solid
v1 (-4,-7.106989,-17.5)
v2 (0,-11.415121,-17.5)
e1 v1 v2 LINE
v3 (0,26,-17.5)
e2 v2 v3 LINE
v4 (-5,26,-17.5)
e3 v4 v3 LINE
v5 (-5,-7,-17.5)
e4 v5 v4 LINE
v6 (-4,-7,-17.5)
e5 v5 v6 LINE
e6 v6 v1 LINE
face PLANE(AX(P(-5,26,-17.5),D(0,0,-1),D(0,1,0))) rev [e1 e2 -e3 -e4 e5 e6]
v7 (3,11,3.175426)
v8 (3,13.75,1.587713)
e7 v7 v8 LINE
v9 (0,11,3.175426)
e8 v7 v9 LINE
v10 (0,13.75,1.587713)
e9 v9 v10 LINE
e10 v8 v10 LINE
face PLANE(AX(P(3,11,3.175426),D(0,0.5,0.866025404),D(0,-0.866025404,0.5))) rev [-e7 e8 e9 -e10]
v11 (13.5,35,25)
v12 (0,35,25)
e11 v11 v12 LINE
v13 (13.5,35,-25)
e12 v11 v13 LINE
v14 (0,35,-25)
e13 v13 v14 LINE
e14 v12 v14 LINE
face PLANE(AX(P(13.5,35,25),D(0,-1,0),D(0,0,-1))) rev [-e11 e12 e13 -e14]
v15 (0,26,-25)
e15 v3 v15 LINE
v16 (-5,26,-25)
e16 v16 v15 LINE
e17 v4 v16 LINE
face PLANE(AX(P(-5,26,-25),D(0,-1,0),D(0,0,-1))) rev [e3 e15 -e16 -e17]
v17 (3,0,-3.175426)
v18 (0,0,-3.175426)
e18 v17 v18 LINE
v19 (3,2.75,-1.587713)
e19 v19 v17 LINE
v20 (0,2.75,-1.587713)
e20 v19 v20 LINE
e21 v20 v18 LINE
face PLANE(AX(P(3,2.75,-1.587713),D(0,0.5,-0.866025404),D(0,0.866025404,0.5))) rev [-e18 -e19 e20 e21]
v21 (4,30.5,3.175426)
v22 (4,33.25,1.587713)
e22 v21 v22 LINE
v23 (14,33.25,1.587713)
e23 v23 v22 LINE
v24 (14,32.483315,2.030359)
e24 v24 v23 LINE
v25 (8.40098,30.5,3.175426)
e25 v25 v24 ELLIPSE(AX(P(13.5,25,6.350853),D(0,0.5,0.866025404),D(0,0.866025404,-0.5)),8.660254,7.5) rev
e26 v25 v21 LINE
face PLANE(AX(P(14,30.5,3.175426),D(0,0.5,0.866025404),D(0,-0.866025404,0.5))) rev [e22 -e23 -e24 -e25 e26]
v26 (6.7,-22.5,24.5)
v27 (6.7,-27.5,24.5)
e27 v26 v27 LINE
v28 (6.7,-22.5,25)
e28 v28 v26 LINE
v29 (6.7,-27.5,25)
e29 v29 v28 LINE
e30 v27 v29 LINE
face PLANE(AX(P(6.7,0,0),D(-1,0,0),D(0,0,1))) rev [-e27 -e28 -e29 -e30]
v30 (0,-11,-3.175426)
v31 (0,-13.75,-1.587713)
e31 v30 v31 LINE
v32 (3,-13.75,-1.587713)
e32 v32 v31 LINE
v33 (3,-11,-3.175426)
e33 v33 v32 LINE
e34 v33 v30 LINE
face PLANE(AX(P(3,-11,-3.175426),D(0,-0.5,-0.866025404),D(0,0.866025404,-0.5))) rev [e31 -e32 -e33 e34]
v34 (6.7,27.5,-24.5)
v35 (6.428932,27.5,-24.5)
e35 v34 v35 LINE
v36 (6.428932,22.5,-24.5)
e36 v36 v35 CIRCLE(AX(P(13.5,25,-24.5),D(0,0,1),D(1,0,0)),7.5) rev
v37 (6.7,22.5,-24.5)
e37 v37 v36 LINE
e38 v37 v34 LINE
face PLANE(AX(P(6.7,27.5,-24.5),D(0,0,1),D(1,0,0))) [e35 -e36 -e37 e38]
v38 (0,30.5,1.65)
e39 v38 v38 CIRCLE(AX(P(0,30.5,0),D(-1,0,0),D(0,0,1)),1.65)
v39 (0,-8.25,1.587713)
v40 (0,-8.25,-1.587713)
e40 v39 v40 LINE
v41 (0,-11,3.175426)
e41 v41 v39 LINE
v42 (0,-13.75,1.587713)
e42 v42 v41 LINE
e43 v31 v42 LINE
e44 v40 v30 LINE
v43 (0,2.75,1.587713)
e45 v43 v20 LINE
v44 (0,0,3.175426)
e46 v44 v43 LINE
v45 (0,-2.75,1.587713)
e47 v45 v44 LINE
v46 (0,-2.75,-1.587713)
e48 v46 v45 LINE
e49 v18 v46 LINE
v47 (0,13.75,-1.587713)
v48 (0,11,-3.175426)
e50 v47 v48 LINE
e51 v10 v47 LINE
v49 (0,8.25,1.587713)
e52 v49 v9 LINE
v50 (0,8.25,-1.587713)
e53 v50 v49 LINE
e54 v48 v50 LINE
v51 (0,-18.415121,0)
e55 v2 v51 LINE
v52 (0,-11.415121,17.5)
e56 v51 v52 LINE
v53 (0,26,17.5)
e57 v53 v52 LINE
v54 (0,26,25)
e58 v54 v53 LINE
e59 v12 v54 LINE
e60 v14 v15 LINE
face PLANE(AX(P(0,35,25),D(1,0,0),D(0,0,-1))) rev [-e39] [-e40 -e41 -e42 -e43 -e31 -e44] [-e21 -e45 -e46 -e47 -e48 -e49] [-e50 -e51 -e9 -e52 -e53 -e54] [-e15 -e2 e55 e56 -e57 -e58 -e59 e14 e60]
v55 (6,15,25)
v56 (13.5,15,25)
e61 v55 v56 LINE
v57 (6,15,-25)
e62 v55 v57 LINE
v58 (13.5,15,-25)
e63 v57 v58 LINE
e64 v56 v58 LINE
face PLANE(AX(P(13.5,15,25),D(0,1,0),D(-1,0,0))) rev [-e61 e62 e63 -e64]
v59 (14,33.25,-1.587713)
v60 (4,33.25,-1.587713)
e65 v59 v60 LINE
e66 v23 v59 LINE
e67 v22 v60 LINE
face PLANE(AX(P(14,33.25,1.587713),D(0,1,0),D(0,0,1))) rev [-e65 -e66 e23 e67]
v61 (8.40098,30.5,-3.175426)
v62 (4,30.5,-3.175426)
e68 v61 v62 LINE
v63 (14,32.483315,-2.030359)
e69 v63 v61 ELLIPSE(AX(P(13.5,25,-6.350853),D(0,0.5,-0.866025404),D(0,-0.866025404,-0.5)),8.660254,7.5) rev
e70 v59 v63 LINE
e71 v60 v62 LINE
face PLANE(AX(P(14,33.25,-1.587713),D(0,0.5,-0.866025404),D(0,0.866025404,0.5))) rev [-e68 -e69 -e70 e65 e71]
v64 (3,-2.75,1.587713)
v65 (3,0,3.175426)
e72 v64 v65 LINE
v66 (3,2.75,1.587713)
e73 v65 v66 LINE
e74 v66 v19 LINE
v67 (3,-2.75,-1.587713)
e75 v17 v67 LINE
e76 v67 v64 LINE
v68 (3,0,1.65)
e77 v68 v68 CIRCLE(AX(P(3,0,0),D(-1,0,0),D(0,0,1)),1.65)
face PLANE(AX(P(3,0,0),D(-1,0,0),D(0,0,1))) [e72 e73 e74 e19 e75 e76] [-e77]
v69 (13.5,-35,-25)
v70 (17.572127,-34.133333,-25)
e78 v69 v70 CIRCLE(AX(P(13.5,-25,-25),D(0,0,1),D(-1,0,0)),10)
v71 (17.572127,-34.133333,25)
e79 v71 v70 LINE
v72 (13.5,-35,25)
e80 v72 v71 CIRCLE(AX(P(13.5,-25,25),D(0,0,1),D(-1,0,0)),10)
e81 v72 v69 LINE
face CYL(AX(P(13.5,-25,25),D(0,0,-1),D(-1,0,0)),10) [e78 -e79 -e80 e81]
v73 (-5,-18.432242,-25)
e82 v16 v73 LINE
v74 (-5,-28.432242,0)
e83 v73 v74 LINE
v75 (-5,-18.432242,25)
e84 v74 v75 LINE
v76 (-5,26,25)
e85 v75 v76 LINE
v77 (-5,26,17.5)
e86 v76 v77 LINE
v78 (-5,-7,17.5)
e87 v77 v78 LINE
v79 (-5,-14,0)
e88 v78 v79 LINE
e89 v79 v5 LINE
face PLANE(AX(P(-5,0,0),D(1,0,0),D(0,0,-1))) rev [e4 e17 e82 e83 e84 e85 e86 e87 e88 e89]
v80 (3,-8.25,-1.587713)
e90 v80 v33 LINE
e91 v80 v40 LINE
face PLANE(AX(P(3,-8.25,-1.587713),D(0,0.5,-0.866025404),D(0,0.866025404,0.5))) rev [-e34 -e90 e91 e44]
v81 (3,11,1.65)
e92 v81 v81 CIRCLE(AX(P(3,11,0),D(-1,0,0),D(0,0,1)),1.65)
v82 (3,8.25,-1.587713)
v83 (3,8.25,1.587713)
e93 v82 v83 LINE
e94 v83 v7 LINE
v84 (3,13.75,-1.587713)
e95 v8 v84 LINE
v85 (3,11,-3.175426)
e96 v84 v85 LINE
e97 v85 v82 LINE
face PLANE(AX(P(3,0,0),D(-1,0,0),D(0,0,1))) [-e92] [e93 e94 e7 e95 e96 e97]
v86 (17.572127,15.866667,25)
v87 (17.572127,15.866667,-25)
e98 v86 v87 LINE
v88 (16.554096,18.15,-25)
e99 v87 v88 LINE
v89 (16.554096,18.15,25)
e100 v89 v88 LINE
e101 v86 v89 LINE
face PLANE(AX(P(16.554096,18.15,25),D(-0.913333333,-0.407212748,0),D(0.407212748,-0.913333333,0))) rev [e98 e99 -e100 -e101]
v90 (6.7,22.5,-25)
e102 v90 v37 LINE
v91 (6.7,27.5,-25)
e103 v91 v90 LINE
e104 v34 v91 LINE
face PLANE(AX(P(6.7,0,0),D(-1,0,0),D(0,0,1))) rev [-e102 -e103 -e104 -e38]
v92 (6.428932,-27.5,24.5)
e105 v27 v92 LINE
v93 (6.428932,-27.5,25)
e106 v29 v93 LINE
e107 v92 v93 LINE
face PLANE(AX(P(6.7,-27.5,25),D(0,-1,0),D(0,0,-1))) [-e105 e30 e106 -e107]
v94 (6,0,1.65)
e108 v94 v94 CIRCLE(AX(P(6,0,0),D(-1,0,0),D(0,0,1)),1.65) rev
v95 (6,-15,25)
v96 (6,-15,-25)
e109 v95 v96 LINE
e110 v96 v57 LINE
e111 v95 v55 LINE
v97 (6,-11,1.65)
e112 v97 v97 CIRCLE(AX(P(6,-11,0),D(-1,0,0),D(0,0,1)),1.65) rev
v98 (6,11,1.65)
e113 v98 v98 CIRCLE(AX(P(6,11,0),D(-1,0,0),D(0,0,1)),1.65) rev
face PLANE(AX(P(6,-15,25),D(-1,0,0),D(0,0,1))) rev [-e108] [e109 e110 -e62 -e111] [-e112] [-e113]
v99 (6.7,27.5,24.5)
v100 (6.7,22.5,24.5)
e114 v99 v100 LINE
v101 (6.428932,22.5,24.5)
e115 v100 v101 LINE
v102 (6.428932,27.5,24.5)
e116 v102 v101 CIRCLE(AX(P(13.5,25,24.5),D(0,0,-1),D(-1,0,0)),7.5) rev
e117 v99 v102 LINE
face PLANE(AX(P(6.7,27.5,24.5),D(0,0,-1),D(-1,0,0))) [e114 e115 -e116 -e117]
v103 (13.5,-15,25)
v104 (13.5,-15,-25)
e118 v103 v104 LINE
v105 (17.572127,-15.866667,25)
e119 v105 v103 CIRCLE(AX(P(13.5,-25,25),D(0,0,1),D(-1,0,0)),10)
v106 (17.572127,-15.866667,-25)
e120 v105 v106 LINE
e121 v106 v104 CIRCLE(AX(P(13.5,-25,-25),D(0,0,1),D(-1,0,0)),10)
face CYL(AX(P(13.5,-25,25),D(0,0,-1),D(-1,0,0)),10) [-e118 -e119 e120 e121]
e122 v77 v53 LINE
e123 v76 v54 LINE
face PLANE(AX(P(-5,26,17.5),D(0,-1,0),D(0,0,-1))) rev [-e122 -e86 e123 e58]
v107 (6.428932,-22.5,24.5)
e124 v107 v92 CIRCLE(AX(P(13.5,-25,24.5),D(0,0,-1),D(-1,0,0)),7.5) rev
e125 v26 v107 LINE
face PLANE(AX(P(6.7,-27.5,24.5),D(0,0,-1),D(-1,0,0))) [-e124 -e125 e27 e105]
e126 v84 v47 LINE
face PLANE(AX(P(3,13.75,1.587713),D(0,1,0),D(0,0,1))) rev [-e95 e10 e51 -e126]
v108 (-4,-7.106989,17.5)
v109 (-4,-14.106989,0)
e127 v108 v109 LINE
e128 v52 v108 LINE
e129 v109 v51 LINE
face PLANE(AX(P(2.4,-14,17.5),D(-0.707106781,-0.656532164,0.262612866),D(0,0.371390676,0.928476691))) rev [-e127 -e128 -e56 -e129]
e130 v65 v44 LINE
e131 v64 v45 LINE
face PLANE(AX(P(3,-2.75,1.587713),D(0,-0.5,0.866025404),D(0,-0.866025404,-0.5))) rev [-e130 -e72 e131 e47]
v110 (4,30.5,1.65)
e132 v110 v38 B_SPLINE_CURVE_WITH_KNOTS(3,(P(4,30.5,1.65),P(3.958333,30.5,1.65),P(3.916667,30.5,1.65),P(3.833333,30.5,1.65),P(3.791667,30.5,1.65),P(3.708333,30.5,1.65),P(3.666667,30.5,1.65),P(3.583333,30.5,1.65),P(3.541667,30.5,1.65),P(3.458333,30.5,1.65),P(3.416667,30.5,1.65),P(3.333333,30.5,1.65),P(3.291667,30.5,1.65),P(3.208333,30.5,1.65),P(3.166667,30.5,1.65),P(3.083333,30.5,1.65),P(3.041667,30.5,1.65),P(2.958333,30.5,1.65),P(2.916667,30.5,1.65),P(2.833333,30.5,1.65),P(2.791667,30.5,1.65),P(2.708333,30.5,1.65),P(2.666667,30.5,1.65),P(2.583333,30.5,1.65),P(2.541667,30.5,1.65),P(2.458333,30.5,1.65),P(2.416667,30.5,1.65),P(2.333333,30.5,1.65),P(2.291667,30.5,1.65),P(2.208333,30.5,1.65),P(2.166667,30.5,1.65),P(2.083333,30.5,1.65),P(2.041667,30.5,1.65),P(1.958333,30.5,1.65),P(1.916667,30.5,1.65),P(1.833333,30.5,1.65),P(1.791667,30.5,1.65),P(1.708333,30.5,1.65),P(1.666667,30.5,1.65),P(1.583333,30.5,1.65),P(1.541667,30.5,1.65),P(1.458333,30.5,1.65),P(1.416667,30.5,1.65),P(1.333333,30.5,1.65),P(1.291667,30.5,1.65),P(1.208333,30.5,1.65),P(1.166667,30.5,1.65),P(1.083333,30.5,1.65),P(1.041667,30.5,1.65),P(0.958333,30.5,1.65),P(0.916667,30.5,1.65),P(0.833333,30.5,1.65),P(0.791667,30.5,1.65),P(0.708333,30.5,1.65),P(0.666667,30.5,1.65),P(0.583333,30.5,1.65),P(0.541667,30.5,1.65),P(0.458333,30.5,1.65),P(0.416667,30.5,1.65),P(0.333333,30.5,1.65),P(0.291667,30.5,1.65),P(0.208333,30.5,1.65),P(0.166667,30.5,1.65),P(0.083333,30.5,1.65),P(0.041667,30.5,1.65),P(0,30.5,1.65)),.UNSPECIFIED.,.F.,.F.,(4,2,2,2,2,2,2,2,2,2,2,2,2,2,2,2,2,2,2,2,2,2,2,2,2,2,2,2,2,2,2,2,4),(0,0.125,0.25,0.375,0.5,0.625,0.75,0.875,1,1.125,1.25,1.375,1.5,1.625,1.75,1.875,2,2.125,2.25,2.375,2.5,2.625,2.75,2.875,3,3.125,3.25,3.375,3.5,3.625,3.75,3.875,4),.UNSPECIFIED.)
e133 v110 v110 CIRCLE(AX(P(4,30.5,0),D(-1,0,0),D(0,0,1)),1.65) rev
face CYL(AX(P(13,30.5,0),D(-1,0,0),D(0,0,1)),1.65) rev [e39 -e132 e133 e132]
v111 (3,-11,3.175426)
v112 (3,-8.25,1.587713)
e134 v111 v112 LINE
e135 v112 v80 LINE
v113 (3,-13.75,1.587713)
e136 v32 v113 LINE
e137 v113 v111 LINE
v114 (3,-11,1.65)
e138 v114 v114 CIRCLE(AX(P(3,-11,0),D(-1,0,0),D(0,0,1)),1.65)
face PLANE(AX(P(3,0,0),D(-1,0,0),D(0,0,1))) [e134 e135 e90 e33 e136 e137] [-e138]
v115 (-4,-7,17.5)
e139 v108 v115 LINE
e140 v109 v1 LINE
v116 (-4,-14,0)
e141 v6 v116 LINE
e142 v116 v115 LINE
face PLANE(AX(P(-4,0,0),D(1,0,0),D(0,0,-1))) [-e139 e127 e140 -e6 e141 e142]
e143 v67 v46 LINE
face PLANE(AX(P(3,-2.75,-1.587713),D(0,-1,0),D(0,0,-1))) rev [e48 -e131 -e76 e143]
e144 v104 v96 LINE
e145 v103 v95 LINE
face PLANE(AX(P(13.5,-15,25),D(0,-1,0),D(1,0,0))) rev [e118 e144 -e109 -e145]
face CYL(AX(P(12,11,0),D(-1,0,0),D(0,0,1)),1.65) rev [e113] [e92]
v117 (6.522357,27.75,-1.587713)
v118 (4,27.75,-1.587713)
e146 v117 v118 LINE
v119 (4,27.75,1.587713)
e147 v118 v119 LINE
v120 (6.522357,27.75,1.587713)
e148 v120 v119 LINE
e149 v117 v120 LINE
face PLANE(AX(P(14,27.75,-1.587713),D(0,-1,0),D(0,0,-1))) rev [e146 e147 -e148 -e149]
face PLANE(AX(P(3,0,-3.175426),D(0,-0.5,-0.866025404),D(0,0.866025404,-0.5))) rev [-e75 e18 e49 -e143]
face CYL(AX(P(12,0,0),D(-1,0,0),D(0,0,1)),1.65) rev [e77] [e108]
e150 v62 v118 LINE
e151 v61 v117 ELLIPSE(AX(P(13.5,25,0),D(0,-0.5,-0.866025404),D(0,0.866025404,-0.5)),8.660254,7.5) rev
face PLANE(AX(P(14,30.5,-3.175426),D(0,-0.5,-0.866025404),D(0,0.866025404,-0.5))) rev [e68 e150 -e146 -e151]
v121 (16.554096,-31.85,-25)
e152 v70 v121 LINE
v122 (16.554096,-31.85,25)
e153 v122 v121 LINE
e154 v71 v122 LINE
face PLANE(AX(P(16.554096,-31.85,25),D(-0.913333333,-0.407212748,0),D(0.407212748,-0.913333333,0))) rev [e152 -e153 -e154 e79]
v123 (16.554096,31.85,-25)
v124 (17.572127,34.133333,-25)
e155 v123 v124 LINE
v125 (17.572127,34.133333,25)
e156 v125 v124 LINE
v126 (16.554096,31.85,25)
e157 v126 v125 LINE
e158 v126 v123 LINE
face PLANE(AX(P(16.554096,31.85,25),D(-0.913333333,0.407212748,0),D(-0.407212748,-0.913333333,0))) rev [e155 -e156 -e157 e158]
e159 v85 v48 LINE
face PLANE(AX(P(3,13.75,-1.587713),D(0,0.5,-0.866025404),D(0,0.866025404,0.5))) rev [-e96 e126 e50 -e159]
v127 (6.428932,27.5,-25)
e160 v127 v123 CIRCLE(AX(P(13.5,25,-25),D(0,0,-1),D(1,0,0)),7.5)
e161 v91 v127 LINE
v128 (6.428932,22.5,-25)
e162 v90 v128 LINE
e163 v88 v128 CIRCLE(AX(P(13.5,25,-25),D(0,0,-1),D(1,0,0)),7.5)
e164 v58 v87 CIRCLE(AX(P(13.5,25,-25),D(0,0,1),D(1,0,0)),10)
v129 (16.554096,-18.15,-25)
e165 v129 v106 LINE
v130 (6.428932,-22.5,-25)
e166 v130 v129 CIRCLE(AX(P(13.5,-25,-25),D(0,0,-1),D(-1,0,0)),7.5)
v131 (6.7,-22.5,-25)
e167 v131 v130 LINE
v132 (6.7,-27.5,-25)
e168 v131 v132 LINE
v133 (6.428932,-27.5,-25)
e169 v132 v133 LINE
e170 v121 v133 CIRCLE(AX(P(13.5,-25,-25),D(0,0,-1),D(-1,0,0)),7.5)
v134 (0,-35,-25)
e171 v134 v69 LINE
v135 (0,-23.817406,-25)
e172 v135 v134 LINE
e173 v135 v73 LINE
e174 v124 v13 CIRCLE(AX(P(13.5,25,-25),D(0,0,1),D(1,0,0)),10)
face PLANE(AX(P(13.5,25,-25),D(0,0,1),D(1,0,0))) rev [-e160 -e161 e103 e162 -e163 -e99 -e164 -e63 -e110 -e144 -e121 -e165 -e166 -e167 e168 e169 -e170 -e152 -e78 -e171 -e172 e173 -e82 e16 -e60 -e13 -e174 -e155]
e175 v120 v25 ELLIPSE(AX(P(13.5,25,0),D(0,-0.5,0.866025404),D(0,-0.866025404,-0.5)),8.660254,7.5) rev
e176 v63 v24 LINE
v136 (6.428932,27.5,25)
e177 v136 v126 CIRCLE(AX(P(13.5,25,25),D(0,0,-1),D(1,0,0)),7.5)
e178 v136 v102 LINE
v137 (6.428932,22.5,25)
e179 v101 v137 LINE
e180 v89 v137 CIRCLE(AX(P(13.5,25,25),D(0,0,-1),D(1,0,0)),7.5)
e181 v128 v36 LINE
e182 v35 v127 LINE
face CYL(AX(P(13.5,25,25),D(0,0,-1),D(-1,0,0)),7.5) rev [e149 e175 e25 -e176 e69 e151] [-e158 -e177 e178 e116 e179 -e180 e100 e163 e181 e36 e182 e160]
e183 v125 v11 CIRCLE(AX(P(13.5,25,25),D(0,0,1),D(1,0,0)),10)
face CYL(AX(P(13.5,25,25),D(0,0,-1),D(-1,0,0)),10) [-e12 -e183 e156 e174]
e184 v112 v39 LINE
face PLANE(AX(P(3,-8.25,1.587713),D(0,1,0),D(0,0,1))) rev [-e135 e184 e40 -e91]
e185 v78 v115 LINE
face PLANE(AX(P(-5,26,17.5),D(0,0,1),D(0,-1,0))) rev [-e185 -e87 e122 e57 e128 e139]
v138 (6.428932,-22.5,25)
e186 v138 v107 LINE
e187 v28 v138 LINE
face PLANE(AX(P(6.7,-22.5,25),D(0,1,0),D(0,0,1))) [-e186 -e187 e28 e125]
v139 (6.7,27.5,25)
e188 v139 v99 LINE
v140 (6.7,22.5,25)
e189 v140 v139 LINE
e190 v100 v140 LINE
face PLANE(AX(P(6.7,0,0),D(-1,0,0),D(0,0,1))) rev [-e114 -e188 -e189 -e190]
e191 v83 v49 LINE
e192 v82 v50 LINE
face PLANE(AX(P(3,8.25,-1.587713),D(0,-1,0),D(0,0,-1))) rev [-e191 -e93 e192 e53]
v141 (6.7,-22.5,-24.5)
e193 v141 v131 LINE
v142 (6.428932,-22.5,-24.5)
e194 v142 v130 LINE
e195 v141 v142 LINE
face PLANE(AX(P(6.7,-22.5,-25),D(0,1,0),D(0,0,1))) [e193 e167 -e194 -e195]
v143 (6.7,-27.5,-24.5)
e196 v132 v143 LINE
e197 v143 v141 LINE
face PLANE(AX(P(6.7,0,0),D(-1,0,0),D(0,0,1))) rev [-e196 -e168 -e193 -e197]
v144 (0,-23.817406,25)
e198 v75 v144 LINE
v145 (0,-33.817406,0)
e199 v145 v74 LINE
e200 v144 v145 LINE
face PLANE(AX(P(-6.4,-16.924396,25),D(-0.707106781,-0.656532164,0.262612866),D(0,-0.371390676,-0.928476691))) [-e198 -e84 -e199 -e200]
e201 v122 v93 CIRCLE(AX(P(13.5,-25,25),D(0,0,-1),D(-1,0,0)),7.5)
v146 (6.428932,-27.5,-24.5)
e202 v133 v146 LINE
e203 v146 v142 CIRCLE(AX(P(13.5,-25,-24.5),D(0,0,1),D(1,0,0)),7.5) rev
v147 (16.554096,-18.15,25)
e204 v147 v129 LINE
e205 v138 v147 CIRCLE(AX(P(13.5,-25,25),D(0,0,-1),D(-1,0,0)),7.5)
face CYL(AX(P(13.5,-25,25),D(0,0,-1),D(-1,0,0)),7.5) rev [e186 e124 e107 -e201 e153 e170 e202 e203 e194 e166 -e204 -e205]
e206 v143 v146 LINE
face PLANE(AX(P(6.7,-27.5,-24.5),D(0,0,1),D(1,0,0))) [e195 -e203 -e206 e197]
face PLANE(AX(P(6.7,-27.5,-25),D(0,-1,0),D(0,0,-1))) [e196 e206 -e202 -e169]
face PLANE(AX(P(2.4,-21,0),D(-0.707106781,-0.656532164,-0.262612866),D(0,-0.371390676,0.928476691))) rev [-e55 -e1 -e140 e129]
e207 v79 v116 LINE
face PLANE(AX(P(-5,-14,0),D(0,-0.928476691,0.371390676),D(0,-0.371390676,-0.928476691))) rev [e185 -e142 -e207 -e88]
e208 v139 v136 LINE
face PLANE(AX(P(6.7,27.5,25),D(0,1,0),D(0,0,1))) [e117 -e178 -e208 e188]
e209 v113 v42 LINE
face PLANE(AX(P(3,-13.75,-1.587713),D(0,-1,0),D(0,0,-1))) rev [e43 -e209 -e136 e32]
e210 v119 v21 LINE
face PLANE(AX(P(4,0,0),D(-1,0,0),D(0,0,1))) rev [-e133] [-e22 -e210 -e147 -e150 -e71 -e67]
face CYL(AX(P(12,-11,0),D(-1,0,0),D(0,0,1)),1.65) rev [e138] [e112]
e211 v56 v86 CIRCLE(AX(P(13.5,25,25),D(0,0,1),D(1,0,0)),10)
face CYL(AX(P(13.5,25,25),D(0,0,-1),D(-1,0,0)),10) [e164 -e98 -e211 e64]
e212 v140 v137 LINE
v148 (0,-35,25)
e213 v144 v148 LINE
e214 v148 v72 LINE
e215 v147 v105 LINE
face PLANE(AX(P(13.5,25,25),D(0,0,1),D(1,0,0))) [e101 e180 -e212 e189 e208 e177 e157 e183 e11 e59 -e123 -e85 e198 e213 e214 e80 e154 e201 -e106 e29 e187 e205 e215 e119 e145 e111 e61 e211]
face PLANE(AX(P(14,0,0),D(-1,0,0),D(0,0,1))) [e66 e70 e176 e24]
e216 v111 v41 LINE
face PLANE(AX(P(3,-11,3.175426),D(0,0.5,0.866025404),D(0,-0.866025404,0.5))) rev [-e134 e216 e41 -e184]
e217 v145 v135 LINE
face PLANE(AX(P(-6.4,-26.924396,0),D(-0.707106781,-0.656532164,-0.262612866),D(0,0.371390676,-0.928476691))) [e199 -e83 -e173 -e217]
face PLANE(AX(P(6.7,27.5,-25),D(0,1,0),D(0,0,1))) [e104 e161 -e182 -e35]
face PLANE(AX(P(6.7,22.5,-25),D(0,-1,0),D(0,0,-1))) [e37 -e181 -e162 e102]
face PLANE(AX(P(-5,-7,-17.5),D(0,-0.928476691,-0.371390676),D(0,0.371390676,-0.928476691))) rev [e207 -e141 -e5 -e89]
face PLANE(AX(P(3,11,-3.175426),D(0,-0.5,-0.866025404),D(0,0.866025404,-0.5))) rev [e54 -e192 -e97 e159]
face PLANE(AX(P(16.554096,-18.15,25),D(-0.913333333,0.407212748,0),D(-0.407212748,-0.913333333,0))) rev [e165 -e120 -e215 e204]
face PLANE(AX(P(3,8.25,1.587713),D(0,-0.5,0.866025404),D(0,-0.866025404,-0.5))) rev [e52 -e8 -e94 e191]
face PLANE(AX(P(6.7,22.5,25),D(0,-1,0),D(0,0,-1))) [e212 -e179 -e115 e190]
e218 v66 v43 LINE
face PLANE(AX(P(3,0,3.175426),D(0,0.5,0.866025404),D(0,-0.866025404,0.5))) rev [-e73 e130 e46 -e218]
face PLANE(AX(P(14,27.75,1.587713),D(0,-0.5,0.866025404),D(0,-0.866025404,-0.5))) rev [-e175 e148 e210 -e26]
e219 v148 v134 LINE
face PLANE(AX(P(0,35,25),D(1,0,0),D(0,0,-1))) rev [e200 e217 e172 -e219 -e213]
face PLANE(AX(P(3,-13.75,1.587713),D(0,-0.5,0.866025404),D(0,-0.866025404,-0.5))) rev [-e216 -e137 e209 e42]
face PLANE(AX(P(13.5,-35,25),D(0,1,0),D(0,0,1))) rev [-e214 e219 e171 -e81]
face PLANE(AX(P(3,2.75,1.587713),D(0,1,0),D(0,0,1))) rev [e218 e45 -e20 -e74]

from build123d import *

# Parameters (mm, degrees)
RESSALTO_EXTRUS_O1_DEPTH   = 25
CORTE_EXTRUS_O3_DEPTH      = 6
CORTE_EXTRUS_O3_DEPTH_BACK = 10
ESBO_O6_R                  = 1.65
CORTE_EXTRUS_O5_DEPTH      = 3
ESBO_O10_W                 = 0.5
ESBO_O10_H                 = 5
RESSALTO_EXTRUS_O3_DEPTH   = 6.7
RESSALTO_EXTRUS_O4_DEPTH   = 5
CORTE_EXTRUS_O6_START      = -1
CORTE_EXTRUS_O6_DEPTH      = 4
CHANFRO1_SIZE              = 6.4
ESBO_O13_R                 = 1.65
CORTE_EXTRUS_O7_DEPTH      = 13
CORTE_EXTRUS_O8_START      = -4
CORTE_EXTRUS_O8_DEPTH      = 10
CHANFRO2_SIZE              = 6.4


with BuildPart() as part:
    # Esboço1 → Ressalto-extrusão1 (new, symmetric)
    with BuildSketch(Plane.XY):
        with BuildLine():
            Line((0, 35), (0, -35))
            Line((0, -35), (13.5, -35))
            ThreePointArc((13.5, -35), (15.581665999, -34.780933834), (17.572127481, -34.133333333))
            Line((17.572127481, -34.133333333), (16.554095611, -31.85))
            ThreePointArc((16.554095611, -31.85), (6, -25), (16.554095611, -18.15))
            Line((16.554095611, -18.15), (17.572127481, -15.866666667))
            ThreePointArc((17.572127481, -15.866666667), (15.581665999, -15.219066166), (13.5, -15))
            Line((13.5, -15), (6, -15))
            Line((6, -15), (6, 15))
            Line((6, 15), (13.5, 15))
            ThreePointArc((13.5, 15), (15.581665999, 15.219066166), (17.572127481, 15.866666667))
            Line((17.572127481, 15.866666667), (16.554095611, 18.15))
            ThreePointArc((16.554095611, 18.15), (6, 25), (16.554095611, 31.85))
            Line((16.554095611, 31.85), (17.572127481, 34.133333333))
            ThreePointArc((17.572127481, 34.133333333), (15.581665999, 34.780933834), (13.5, 35))
            Line((13.5, 35), (0, 35))
        make_face()
    extrude(amount=RESSALTO_EXTRUS_O1_DEPTH, both=True)

    # Esboço6 → Corte-extrusão3 (cut, two sides: drawn at the far end of the back side and taken through both)
    with BuildSketch(Plane(origin=(6, 0, 0), x_dir=(0, 0, -1), z_dir=(1, 0, 0)).offset(-CORTE_EXTRUS_O3_DEPTH_BACK)):
        with Locations(Location((0, 11, 0), (0, 0, 180))):
            Circle(ESBO_O6_R)
        with Locations(Location((0, -11, 0), (0, 0, 180))):
            Circle(ESBO_O6_R)
        with Locations(Location((0, 0, 0), (0, 0, 180))):
            Circle(ESBO_O6_R)
    extrude(amount=CORTE_EXTRUS_O3_DEPTH + CORTE_EXTRUS_O3_DEPTH_BACK, mode=Mode.SUBTRACT)

    # Esboço9 → Corte-extrusão5 (cut)
    with BuildSketch(Plane.ZY):
        Polygon((3.175426481, 11), (1.58771324, 13.75), (-1.58771324, 13.75), (-3.175426481, 11), (-1.58771324, 8.25), (1.58771324, 8.25), align=None)
        Polygon((3.175426481, 0), (1.58771324, 2.75), (-1.58771324, 2.75), (-3.175426481, 0), (-1.58771324, -2.75), (1.58771324, -2.75), align=None)
        Polygon((3.175426481, -11), (1.58771324, -8.25), (-1.58771324, -8.25), (-3.175426481, -11), (-1.58771324, -13.75), (1.58771324, -13.75), align=None)
    extrude(amount=-CORTE_EXTRUS_O5_DEPTH, mode=Mode.SUBTRACT)

    # Esboço10 → Ressalto-extrusão3 (add)
    with BuildSketch(Plane.ZY):
        with Locations((-24.75, 25)):
            Rectangle(ESBO_O10_W, ESBO_O10_H)
        with Locations((24.75, 25)):
            Rectangle(ESBO_O10_W, ESBO_O10_H)
        with Locations((24.75, -25)):
            Rectangle(ESBO_O10_W, ESBO_O10_H)
        with Locations((-24.75, -25)):
            Rectangle(ESBO_O10_W, ESBO_O10_H)
    extrude(amount=-RESSALTO_EXTRUS_O3_DEPTH)

    # Esboço11 → Ressalto-extrusão4 (add)
    with BuildSketch(Plane.ZY):
        Polygon((-17.5, -7), (0, -14), (17.5, -7), (17.5, 26), (25, 26), (25, -16.924395537), (0, -26.924395537), (-25, -16.924395537), (-25, 26), (-17.5, 26), align=None)
    extrude(amount=RESSALTO_EXTRUS_O4_DEPTH)

    # Esboço12 → Corte-extrusão6 (cut)
    with BuildSketch(Plane.ZY.offset(5).offset(CORTE_EXTRUS_O6_START)):
        Polygon((-17.5, -7), (17.5, -7), (17.5, -14), (0, -21), (-17.5, -14), align=None)
    extrude(amount=-CORTE_EXTRUS_O6_DEPTH, mode=Mode.SUBTRACT)

    # Chanfro1
    # the kernel refuses this chamfer: 6.4 mm, written as the material it adds along each edge
    with BuildSketch(Plane(origin=(-4, -27.112634139, 15.281585348), x_dir=(0.9996219169112968, -0.025529280528386773, -0.01021171221135471), z_dir=(0, 0.3713906763541037, -0.9284766908852593))) as chanfro1_piece_1_section:
        Polygon((CHANFRO1_SIZE * 0.999621916911, -CHANFRO1_SIZE * 0.0274958766106), (-CHANFRO1_SIZE * 0.0274958766106, -CHANFRO1_SIZE * 0.999621916911), (0, 0), align=None)
    chanfro1_piece_1 = extrude(amount=51.765619071, mode=Mode.PRIVATE)
    chanfro1_piece_1 = split(chanfro1_piece_1, bisect_by=Plane(origin=(-1.981352532, -15.655988855, -17.5), z_dir=(0, 0, 1)), keep=Keep.TOP, mode=Mode.PRIVATE)
    chanfro1_piece_1 = split(chanfro1_piece_1, bisect_by=Plane(origin=(-1.981352532, -22.750248134, -4.375620334), z_dir=(0, 0.9284766908852595, -0.37139067635410344)), keep=Keep.TOP, mode=Mode.PRIVATE)
    add(chanfro1_piece_1)
    with BuildSketch(Plane(origin=(-4, -7.887365861, 32.781585348), x_dir=(0.9996219169112968, -0.02552928052838657, 0.010211712211354616), z_dir=(0, -0.37139067635410344, -0.9284766908852595))) as chanfro1_piece_2_section:
        Polygon((CHANFRO1_SIZE * 0.999621916911, -CHANFRO1_SIZE * 0.0274958766106), (-CHANFRO1_SIZE * 0.0274958766106, -CHANFRO1_SIZE * 0.999621916911), (0, 0), align=None)
    chanfro1_piece_2 = extrude(amount=51.765619071, mode=Mode.PRIVATE)
    chanfro1_piece_2 = split(chanfro1_piece_2, bisect_by=Plane(origin=(-1.981352532, -22.750248134, 4.375620334), z_dir=(0, 0.9284766908852595, 0.3713906763541038)), keep=Keep.TOP, mode=Mode.PRIVATE)
    chanfro1_piece_2 = split(chanfro1_piece_2, bisect_by=Plane(origin=(-1.981352532, -15.655988855, 17.5), z_dir=(0, 0, -1)), keep=Keep.TOP, mode=Mode.PRIVATE)
    add(chanfro1_piece_2)

    # Esboço13 → Corte-extrusão7 (cut)
    with BuildSketch(Plane.ZY):
        with Locations((0, 30.5)):
            Circle(ESBO_O13_R)
    extrude(amount=-CORTE_EXTRUS_O7_DEPTH, mode=Mode.SUBTRACT)

    # Esboço14 → Corte-extrusão8 (cut)
    with BuildSketch(Plane.ZY.offset(CORTE_EXTRUS_O8_START)):
        Polygon((3.175426481, 30.5), (1.58771324, 33.25), (-1.58771324, 33.25), (-3.175426481, 30.5), (-1.58771324, 27.75), (1.58771324, 27.75), align=None)
    extrude(amount=-CORTE_EXTRUS_O8_DEPTH, mode=Mode.SUBTRACT)

    # Chanfro2
    # the kernel refuses this chamfer: 6.4 mm, written as the material it adds along each edge
    with BuildSketch(Plane(origin=(0, -33.037029676, 15.281585348), x_dir=(-0.9996219169112968, 0.02552928052838658, 0.010211712211354642), z_dir=(0, 0.37139067635410405, -0.9284766908852592))) as chanfro2_piece_1_section:
        Polygon((CHANFRO2_SIZE * 0.999621916911, -CHANFRO2_SIZE * 0.0274958766106), (-CHANFRO2_SIZE * 0.0274958766106, -CHANFRO2_SIZE * 0.999621916911), (0, 0), align=None)
    chanfro2_piece_1 = extrude(amount=59.843366282, mode=Mode.PRIVATE)
    chanfro2_piece_1 = split(chanfro2_piece_1, bisect_by=Plane(origin=(-5, -23.598020322, -13.89468732), z_dir=(1, 0, 0)), keep=Keep.TOP, mode=Mode.PRIVATE)
    chanfro2_piece_1 = split(chanfro2_piece_1, bisect_by=Plane(origin=(-1.952897505, -23.598020322, -25), z_dir=(0, 0, 1)), keep=Keep.TOP, mode=Mode.PRIVATE)
    chanfro2_piece_1 = split(chanfro2_piece_1, bisect_by=Plane(origin=(-1.952897505, -31.256856652, -10.831152788), z_dir=(0, 0.9284766908852593, -0.3713906763541039)), keep=Keep.TOP, mode=Mode.PRIVATE)
    add(chanfro2_piece_1)
    with BuildSketch(Plane(origin=(0, -10.811761398, 40.281585348), x_dir=(-0.9996219169112968, 0.02552928052838644, -0.010211712211354581), z_dir=(0, -0.3713906763541039, -0.9284766908852593))) as chanfro2_piece_2_section:
        Polygon((CHANFRO2_SIZE * 0.999621916911, -CHANFRO2_SIZE * 0.0274958766106), (-CHANFRO2_SIZE * 0.0274958766106, -CHANFRO2_SIZE * 0.999621916911), (0, 0), align=None)
    chanfro2_piece_2 = extrude(amount=59.843366282, mode=Mode.PRIVATE)
    chanfro2_piece_2 = split(chanfro2_piece_2, bisect_by=Plane(origin=(-5, -23.598020322, 13.89468732), z_dir=(1, 0, 0)), keep=Keep.TOP, mode=Mode.PRIVATE)
    chanfro2_piece_2 = split(chanfro2_piece_2, bisect_by=Plane(origin=(-1.952897505, -23.598020322, 25), z_dir=(0, 0, -1)), keep=Keep.TOP, mode=Mode.PRIVATE)
    chanfro2_piece_2 = split(chanfro2_piece_2, bisect_by=Plane(origin=(-1.952897505, -31.256856652, 10.831152788), z_dir=(0, 0.9284766908852592, 0.37139067635410405)), keep=Keep.TOP, mode=Mode.PRIVATE)
    add(chanfro2_piece_2)
    with BuildSketch(Plane(origin=(0, -10.811761398, 40.281585348), x_dir=(-0.9996219169112968, 0.02552928052838644, -0.010211712211354581), z_dir=(0, -0.3713906763541039, -0.9284766908852593))) as chanfro2_piece_3a_section:
        Polygon((CHANFRO2_SIZE * 0.999621916911, -CHANFRO2_SIZE * 0.0274958766106), (-CHANFRO2_SIZE * 0.0274958766106, -CHANFRO2_SIZE * 0.999621916911), (0, 0), align=None)
    chanfro2_piece_3a = extrude(amount=59.843366282, mode=Mode.PRIVATE)
    chanfro2_piece_3a = split(chanfro2_piece_3a, bisect_by=Plane(origin=(-5, -31.260156378, -5.039042683), z_dir=(1, 0, 0)), keep=Keep.TOP, mode=Mode.PRIVATE)
    chanfro2_piece_3a = split(chanfro2_piece_3a, bisect_by=Plane(origin=(-1.927343951, -25.78483059, -2.848912368), z_dir=(0, -0.9284766908852592, -0.37139067635410405)), keep=Keep.TOP, mode=Mode.PRIVATE)
    chanfro2_piece_3a = split(chanfro2_piece_3a, bisect_by=Plane(origin=(-1.927343951, -35, -5.039042683), z_dir=(0, 1, 0)), keep=Keep.TOP, mode=Mode.PRIVATE)
    with BuildSketch(Plane(origin=(0, -33.037029676, 15.281585348), x_dir=(-0.9996219169112968, 0.02552928052838658, 0.010211712211354642), z_dir=(0, 0.37139067635410405, -0.9284766908852592))) as chanfro2_piece_3b_section:
        Polygon((CHANFRO2_SIZE * 0.999621916911, -CHANFRO2_SIZE * 0.0274958766106), (-CHANFRO2_SIZE * 0.0274958766106, -CHANFRO2_SIZE * 0.999621916911), (0, 0), align=None)
    chanfro2_piece_3b = extrude(amount=59.843366282, mode=Mode.PRIVATE)
    chanfro2_piece_3b = split(chanfro2_piece_3b, bisect_by=Plane(origin=(-5, -31.260156378, 5.039042683), z_dir=(1, 0, 0)), keep=Keep.TOP, mode=Mode.PRIVATE)
    chanfro2_piece_3b = split(chanfro2_piece_3b, bisect_by=Plane(origin=(-1.927343951, -25.78483059, 2.848912368), z_dir=(0, -0.9284766908852593, 0.3713906763541039)), keep=Keep.TOP, mode=Mode.PRIVATE)
    chanfro2_piece_3b = split(chanfro2_piece_3b, bisect_by=Plane(origin=(-1.927343951, -35, 5.039042683), z_dir=(0, 1, 0)), keep=Keep.TOP, mode=Mode.PRIVATE)
    chanfro2_piece_3 = chanfro2_piece_3a & chanfro2_piece_3b
    add(chanfro2_piece_3)


solid = part.part
